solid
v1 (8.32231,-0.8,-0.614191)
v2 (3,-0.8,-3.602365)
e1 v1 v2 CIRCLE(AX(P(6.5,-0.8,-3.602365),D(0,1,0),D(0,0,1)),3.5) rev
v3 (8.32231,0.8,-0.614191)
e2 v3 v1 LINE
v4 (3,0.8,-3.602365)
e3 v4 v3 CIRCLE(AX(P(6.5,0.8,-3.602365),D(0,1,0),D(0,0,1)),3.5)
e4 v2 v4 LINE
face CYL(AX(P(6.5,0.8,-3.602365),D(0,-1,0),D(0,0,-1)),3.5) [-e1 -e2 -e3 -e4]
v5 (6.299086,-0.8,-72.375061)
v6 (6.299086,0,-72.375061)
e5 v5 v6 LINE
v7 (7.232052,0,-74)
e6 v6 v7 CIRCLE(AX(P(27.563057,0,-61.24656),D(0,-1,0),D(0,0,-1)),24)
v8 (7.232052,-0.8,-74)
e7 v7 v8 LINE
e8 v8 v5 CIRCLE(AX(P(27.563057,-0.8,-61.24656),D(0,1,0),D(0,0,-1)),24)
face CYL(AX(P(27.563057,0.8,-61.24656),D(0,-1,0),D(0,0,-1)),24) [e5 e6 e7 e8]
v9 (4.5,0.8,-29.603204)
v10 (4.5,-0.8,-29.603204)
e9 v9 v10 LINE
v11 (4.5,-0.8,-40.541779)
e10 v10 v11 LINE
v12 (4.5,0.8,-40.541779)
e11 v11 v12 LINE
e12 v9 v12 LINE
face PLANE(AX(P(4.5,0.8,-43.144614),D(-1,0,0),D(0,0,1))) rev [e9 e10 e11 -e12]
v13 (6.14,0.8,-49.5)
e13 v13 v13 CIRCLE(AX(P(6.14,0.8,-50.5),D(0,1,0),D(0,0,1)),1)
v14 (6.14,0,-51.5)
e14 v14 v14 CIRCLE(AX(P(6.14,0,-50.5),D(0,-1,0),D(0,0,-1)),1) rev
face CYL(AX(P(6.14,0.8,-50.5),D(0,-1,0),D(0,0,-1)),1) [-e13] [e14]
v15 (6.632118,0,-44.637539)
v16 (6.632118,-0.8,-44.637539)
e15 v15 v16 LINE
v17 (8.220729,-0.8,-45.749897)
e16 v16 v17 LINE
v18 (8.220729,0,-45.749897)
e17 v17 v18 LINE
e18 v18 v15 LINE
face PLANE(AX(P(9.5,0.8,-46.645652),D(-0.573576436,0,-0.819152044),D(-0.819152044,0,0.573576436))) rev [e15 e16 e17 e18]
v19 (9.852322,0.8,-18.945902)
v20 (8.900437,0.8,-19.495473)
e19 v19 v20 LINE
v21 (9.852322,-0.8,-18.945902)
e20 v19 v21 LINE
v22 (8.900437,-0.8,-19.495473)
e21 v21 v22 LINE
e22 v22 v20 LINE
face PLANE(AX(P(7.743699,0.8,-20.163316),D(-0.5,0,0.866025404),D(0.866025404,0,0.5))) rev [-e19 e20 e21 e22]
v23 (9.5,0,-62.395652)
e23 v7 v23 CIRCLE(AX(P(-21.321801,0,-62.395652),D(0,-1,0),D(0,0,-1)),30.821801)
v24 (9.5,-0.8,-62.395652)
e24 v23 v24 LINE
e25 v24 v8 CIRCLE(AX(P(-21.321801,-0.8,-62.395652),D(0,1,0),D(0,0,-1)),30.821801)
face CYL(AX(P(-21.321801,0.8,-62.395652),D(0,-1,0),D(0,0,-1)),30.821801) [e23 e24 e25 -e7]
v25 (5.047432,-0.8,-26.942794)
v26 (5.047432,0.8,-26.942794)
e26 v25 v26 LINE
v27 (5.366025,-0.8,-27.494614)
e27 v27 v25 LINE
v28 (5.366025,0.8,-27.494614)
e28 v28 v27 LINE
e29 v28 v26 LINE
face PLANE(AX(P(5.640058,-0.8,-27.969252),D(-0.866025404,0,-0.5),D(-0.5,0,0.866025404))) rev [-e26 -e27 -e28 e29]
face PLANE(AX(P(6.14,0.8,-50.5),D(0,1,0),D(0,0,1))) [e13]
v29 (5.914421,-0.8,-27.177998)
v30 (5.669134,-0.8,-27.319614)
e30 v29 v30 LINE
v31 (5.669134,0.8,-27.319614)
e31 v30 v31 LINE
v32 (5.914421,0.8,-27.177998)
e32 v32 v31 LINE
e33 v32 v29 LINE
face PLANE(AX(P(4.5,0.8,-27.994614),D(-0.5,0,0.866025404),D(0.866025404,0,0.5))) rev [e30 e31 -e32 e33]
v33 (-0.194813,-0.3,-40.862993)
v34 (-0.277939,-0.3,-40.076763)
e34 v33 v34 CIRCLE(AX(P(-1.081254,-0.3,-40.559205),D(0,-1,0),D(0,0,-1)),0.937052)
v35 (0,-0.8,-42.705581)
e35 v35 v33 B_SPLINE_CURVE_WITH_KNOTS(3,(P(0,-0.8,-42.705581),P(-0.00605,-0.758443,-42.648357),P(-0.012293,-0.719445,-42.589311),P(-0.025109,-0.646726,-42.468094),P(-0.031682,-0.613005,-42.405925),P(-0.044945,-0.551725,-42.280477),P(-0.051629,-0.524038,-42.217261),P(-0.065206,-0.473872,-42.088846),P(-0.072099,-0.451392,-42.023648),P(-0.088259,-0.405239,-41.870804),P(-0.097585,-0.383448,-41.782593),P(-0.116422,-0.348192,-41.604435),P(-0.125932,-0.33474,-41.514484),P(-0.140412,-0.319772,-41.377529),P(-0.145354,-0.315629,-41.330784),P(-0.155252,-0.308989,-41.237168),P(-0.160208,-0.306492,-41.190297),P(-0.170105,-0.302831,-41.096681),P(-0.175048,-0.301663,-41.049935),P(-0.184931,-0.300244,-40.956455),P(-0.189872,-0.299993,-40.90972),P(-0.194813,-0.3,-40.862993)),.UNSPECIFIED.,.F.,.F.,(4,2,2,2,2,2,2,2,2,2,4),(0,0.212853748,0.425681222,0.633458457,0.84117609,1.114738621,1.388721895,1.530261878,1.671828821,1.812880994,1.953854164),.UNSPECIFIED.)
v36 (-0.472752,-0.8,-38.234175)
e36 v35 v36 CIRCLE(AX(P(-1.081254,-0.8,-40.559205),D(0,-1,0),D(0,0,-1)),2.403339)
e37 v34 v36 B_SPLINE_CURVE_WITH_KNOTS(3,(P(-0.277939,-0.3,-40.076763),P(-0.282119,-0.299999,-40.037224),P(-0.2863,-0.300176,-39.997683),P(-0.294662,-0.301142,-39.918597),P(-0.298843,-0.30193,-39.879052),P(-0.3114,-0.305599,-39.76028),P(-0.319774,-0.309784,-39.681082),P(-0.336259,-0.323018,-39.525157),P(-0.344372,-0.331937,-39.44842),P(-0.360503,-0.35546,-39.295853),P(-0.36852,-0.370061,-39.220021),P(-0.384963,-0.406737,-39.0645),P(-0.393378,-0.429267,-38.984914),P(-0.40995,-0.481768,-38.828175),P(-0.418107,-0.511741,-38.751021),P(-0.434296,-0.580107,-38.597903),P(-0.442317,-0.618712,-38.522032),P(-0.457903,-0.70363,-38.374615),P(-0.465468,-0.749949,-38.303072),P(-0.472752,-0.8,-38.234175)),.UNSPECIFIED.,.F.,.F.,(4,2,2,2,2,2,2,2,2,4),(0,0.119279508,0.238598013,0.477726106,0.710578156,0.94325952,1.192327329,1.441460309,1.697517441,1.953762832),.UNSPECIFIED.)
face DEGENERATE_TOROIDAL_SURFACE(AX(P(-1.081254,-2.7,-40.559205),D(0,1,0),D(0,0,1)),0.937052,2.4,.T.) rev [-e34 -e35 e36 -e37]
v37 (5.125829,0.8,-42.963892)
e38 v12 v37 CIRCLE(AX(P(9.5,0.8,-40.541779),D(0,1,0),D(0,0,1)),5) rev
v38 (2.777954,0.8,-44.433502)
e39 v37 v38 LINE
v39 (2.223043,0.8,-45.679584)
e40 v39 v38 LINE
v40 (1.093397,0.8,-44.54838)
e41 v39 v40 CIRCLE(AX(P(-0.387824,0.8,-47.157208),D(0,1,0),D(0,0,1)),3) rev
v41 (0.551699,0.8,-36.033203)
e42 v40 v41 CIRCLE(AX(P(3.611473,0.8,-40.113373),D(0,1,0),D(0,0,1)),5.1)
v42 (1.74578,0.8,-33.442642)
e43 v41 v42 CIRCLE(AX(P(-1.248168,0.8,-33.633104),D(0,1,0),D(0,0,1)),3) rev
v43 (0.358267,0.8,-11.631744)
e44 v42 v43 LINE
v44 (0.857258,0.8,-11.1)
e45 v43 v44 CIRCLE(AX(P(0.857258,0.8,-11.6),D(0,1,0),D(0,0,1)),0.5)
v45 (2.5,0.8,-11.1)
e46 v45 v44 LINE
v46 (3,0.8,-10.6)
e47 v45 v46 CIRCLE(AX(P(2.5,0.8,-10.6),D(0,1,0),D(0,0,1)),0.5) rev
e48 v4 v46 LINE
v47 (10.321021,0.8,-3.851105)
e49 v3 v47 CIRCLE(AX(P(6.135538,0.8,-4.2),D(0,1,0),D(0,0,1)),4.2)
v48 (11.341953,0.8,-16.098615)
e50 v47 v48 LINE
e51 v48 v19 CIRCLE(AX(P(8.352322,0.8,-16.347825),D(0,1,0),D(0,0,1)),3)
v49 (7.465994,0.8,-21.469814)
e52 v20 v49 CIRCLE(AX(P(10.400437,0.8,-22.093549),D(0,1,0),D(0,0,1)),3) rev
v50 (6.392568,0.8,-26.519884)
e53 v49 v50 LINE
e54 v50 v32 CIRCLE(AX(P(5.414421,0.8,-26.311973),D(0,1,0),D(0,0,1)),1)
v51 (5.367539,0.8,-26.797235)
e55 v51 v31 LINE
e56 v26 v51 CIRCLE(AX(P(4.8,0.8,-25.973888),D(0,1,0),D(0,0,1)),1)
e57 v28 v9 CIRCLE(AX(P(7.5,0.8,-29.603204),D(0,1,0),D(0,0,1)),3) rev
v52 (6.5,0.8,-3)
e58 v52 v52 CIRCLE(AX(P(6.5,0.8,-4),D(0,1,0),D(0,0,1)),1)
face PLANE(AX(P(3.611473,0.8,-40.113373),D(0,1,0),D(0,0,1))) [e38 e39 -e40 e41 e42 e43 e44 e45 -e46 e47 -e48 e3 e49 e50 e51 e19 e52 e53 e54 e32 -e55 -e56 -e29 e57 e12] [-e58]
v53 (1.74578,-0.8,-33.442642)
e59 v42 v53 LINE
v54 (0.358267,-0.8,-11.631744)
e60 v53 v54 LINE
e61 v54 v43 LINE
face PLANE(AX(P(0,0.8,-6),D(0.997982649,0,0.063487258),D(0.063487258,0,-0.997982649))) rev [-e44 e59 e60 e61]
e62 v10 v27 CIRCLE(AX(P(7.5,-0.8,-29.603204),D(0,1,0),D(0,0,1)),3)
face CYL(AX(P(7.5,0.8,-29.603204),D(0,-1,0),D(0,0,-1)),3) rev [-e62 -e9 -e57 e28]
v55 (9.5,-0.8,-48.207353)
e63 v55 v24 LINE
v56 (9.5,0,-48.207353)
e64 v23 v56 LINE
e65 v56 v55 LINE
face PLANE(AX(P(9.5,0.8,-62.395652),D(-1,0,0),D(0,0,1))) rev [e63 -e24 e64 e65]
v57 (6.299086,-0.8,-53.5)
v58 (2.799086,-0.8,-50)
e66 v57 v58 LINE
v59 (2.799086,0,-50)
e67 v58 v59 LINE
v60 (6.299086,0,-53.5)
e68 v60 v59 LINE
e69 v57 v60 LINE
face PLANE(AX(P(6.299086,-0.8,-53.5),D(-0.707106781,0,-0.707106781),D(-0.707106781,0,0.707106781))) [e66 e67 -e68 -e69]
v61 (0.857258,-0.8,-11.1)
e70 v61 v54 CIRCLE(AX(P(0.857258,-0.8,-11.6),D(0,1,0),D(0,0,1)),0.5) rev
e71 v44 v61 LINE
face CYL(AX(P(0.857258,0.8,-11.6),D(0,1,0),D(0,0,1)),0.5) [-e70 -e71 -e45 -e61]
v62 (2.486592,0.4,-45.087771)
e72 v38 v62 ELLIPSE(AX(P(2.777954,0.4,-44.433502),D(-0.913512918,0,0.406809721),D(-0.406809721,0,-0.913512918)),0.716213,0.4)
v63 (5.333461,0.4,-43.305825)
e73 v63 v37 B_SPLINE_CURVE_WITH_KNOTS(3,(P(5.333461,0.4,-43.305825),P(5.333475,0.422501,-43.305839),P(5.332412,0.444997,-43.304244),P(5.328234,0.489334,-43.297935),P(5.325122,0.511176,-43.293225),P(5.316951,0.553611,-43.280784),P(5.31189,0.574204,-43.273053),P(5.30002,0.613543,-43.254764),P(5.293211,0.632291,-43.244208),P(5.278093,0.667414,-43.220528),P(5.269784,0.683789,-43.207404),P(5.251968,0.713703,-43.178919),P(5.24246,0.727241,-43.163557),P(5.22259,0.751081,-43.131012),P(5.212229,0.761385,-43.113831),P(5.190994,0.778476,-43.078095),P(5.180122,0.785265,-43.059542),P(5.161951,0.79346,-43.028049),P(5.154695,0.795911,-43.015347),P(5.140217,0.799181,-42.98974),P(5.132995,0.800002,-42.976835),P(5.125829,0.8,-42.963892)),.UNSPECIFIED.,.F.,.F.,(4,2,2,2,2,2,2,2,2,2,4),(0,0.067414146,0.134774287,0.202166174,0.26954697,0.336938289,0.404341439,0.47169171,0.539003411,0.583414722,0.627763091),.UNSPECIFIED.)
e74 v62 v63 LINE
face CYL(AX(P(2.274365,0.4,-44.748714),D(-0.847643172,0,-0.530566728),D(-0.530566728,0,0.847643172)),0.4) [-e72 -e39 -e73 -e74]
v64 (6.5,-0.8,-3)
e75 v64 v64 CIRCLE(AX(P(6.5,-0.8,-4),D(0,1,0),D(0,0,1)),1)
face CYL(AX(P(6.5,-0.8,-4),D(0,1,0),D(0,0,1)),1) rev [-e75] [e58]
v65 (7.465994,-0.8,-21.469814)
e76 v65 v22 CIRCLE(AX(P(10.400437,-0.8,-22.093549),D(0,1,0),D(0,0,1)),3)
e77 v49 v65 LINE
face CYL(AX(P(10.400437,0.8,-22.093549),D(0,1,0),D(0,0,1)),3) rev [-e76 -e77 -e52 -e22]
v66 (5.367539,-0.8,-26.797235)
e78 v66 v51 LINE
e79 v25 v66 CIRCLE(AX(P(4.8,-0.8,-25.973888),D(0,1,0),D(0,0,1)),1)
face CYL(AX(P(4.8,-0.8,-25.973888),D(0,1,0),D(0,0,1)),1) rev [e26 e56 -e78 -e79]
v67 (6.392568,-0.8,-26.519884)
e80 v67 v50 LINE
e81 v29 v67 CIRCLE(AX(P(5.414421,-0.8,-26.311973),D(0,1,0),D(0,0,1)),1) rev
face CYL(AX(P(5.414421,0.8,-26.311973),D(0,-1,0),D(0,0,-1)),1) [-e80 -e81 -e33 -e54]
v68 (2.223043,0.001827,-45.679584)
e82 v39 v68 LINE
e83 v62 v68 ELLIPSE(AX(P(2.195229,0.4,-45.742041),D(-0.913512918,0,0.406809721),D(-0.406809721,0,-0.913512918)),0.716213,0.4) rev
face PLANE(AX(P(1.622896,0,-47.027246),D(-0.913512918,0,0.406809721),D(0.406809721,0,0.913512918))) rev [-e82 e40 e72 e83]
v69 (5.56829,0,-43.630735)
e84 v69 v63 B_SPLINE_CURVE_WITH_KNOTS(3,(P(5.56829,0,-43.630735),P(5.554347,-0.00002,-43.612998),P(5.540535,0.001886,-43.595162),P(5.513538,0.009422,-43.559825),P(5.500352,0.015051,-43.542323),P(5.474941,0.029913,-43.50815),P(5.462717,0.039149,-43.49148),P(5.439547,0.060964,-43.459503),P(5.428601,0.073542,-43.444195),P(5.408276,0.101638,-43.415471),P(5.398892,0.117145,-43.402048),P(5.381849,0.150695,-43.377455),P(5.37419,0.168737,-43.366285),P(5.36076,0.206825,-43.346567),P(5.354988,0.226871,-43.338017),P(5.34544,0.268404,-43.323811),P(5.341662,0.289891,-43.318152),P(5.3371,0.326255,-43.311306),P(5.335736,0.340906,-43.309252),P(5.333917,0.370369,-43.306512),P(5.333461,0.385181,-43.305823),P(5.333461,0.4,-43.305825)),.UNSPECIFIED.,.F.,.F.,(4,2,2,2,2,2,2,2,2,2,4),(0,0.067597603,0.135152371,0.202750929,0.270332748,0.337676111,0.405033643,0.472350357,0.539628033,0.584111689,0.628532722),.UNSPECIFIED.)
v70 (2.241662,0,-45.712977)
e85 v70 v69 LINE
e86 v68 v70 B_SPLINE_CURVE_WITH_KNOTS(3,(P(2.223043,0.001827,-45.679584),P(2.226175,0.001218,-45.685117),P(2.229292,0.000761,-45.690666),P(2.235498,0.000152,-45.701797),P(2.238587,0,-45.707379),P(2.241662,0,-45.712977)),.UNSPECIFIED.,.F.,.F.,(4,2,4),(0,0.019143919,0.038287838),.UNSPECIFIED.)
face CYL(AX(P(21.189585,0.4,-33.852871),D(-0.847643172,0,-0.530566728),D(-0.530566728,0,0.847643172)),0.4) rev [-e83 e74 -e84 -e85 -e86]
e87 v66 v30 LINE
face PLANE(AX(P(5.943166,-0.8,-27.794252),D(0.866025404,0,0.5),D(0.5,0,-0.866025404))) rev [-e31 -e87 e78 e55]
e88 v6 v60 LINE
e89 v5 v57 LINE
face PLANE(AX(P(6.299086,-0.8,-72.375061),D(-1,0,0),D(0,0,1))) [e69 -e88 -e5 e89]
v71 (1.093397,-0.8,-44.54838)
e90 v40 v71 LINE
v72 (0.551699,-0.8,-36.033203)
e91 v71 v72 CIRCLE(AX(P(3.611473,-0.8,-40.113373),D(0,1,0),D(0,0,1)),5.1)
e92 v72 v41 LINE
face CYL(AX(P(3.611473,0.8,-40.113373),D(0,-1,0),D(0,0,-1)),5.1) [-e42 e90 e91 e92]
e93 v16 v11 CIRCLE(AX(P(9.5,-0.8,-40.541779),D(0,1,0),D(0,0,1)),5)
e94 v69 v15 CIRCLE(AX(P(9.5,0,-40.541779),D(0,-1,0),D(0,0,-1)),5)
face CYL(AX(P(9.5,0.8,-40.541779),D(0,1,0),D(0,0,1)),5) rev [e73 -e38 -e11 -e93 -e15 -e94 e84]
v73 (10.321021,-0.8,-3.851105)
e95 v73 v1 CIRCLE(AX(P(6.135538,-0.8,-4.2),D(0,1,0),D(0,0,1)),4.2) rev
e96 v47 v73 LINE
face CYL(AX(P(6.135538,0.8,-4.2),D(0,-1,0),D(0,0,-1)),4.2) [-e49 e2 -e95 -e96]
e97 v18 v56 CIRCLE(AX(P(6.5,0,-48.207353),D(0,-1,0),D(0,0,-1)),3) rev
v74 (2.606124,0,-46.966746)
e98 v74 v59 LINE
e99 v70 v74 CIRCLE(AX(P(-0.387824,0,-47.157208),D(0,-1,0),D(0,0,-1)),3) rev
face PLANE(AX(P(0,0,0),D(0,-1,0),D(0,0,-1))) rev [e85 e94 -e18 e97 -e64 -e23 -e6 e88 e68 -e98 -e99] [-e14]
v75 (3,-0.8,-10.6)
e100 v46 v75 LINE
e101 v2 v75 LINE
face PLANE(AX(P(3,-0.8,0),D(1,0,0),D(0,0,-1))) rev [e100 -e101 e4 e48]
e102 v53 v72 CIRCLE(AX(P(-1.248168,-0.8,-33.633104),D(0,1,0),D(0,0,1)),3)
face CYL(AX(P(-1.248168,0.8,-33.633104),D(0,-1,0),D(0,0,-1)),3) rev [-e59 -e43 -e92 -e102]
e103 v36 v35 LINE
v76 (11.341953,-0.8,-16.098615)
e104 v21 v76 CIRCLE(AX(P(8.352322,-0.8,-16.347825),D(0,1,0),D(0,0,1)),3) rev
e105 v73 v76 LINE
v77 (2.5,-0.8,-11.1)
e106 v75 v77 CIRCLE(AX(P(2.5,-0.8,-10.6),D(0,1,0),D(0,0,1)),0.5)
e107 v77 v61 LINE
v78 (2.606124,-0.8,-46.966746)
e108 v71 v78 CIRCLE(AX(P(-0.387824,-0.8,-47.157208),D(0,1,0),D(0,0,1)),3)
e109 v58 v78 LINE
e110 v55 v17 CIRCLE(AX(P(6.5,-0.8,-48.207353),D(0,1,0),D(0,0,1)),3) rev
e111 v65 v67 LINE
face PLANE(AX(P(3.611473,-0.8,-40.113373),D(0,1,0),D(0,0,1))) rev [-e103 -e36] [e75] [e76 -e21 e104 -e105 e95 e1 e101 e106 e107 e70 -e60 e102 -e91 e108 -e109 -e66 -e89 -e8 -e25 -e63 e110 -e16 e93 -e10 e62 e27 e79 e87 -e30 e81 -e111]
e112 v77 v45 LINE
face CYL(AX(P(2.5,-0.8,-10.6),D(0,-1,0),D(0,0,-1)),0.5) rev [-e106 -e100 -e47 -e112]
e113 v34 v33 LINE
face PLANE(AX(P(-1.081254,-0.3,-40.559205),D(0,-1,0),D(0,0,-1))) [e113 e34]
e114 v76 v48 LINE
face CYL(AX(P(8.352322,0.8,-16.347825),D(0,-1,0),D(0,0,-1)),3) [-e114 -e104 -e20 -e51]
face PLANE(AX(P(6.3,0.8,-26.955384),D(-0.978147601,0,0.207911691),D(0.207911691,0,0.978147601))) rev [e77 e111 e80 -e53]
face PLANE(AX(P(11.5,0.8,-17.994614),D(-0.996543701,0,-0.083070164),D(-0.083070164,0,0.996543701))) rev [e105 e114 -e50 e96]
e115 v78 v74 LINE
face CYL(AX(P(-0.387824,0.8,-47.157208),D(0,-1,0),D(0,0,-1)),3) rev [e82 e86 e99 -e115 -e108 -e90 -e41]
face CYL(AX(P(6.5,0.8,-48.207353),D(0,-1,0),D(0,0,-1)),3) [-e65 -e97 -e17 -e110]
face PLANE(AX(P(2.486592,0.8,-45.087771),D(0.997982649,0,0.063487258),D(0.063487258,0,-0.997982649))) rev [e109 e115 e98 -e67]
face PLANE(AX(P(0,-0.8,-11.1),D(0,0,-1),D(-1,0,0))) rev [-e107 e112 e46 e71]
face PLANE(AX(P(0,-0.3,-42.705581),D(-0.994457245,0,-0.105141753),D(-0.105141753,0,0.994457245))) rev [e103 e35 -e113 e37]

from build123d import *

# Parameters (mm, degrees)
BOSS_EXTRUDE1_DEPTH     = 0.8
FILLET1_R               = 4.2
SKETCH2_R               = 1
CUT_EXTRUDE1_DEPTH      = 75.905340264
CUT_EXTRUDE2_DEPTH      = 75.905340264
CUT_EXTRUDE_THIN1_DEPTH = 75.905340264
FILLET2_R               = 3
CUT_EXTRUDE4_DEPTH      = 0.8
FILLET3_R               = 5
FILLET4_R               = 0.4
FILLET5_R               = 3
FILLET6_R               = 1
SKETCH6_R               = 1
BOSS_EXTRUDE2_DEPTH     = 0.8
SKETCH7_W               = 3
SKETCH7_H               = 11.1
CUT_EXTRUDE5_DEPTH      = 75.882809828
FILLET7_R               = 0.5
FILLET8_R               = 0.5
FILLET10_R              = 3.5
CUT_EXTRUDE6_DEPTH      = 0.5
FILLET11_R              = 2.4


# Some blends are built 0.0001 mm under size
with BuildPart() as part:
    # Sketch1 → Boss-Extrude1 (new, symmetric)
    with BuildSketch(Plane(origin=(0, 0, 0), x_dir=(1, 0, 0), z_dir=(0, 1, 0))):
        with BuildLine():
            Line((0, 0), (0, 6))
            Line((0, 6), (1.865312064, 35.32161706))
            ThreePointArc((1.865312064, 35.32161706), (-1.478238126, 40.437157563), (2.486591749, 45.087771133))
            Line((2.486591749, 45.087771133), (3.611473385, 62.770253978))
            ThreePointArc((3.611473385, 62.770253978), (4.720909281, 68.611088902), (7.232052008, 74))
            ThreePointArc((7.232052008, 74), (8.927699757, 68.307599169), (9.5, 62.395651864))
            Line((9.5, 62.395651864), (9.5, 46.645651864))
            Line((9.5, 46.645651864), (4.5, 43.144614173))
            Line((4.5, 43.144614173), (4.5, 27.994614173))
            Line((4.5, 27.994614173), (6.3, 26.955383689))
            Line((6.3, 26.955383689), (7.743698597, 20.163315799))
            Line((7.743698597, 20.163315799), (11.5, 17.994614173))
            Line((11.5, 17.994614173), (10, 0))
            Line((10, 0), (0, 0))
        make_face()
    extrude(amount=BOSS_EXTRUDE1_DEPTH, both=True)

    # Fillet1
    fillet1_edges = [part.edges().sort_by_distance(p)[0] for p in [
        (10, 0, 0),
    ]]
    fillet(fillet1_edges, radius=FILLET1_R)

    # Sketch2 → Cut-Extrude1 (cut, through all)
    with BuildSketch(Plane(origin=(0, 0.8, 0), x_dir=(1, 0, 0), z_dir=(0, 1, 0))):
        with Locations(Location((6.5, 4, 0), (0, 0, 270))):
            Circle(SKETCH2_R)
    extrude(amount=-CUT_EXTRUDE1_DEPTH, mode=Mode.SUBTRACT)

    # Sketch3 → Cut-Extrude2 (cut, through all)
    with BuildSketch(Plane(origin=(0, 0.8, 0), x_dir=(1, 0, 0), z_dir=(0, 1, 0))):
        with BuildLine():
            Line((5.640057539, 27.969251754), (5.047431638, 26.942793585))
            ThreePointArc((5.047431638, 26.942793585), (4.386066515, 25.063581102), (5.367538565, 26.797235046))
            Line((5.367538565, 26.797235046), (5.94316643, 27.794251754))
            Line((5.94316643, 27.794251754), (5.640057539, 27.969251754))
        make_face()
    extrude(amount=-CUT_EXTRUDE2_DEPTH, mode=Mode.SUBTRACT)

    # Sketch4 → Cut-Extrude-Thin1 (cut, through all)
    with BuildSketch(Plane(origin=(0, 0.8, 0), x_dir=(1, 0, 0), z_dir=(0, 1, 0))):
        Polygon((6.299086102, 72.375061168), (6.299086102, 53.5), (2.799086102, 50), (-4.271981709, 57.071067812), (-3.700913898, 57.642135624), (-3.700913898, 72.375061168), align=None)
    extrude(amount=-CUT_EXTRUDE_THIN1_DEPTH, mode=Mode.SUBTRACT)

    # Fillet2
    fillet2_edges = [part.edges().sort_by_distance(p)[0] for p in [
        (1.865312064, 0, -35.32161706),
        (2.486591749, 0, -45.087771133),
        (9.5, 0, -46.645651864),
    ]]
    fillet(fillet2_edges, radius=FILLET2_R)

    # Sketch5 → Cut-Extrude4 (cut)
    with BuildSketch(Plane(origin=(0, 0.8, 0), x_dir=(1, 0, 0), z_dir=(0, 1, 0))):
        Polygon((2.486591749, 45.087771133), (13.455116217, 38.22222401), (13.455116217, 80.886155846), (2.486591749, 80.886155846), (1.62289593, 47.027246142), align=None)
    extrude(amount=-CUT_EXTRUDE4_DEPTH, mode=Mode.SUBTRACT)

    # Fillet3
    fillet3_edges = [part.edges().sort_by_distance(p)[0] for p in [
        (4.5, 0, -43.144614173),
    ]]
    fillet(fillet3_edges, radius=FILLET3_R)

    # Fillet4
    fillet4_edges = [part.edges().sort_by_distance(p)[0] for p in [
        (3.91002639, 0, -44.196798274),
        (3.91002639, 0.8, -44.196798274),
    ]]
    fillet(fillet4_edges, radius=FILLET4_R - 0.0001)  # a hair under: the kernel refuses the full size

    # Fillet5
    # the kernel refuses this fillet: 3 mm, written as the material it adds along each edge
    with BuildSketch(Plane(origin=(4.5, 0.8, -27.994614173), x_dir=(0.8660254037844444, 0, 0.49999999999999023), z_dir=(0, -1, 0))) as fillet5_piece_1:
        with BuildLine():
            CenterArc((1.793781136, -2.893079935), FILLET5_R, 105.342812505, 44.657187495)
            Line((-0.804295075, -1.393079935), (0, 0))
            Line((0, 0), (1, 0))
        make_face()
    extrude(amount=1.6)
    with BuildSketch(Plane(origin=(7.743698597, 0.8, -20.163315799), x_dir=(0.8660254037844403, 0, 0.49999999999999734), z_dir=(0, -1, 0))) as fillet5_piece_2:
        with BuildLine():
            CenterArc((FILLET5_R * 0.445228685309, -FILLET5_R), FILLET5_R, 90, 48)
            Line((-FILLET5_R * 0.297916140169, -FILLET5_R * 0.330869393641), (0, 0))
            Line((0, 0), (FILLET5_R * 0.445228685309, 0))
        make_face()
    extrude(amount=1.6)
    # the kernel refuses this fillet: 3 mm, written as the material it takes off along each edge
    with BuildSketch(Plane(origin=(11.5, -5.55643762, -17.994614173), x_dir=(-0.86602540378444, 0, -0.49999999999999756), z_dir=(0, 1, 0))) as fillet5_2_piece_1:
        with BuildLine():
            CenterArc((FILLET5_R * 0.634191682642, FILLET5_R), FILLET5_R, 205.234939105, 64.765060895)
            Line((-FILLET5_R * 0.270375560362, FILLET5_R * 0.573669021903), (0, 0))
            Line((0, 0), (FILLET5_R * 0.634191682642, 0))
        make_face()
    extrude(amount=11.11287524, mode=Mode.SUBTRACT)

    # Fillet6
    fillet6_edges = [part.edges().sort_by_distance(p)[0] for p in [
        (6.3, 0, -26.955383689),
    ]]
    fillet(fillet6_edges, radius=FILLET6_R)

    # Sketch6 → Boss-Extrude2 (add)
    with BuildSketch(Plane(origin=(0, 0, 0), x_dir=(1, 0, 0), z_dir=(0, 1, 0))):
        with Locations(Location((6.14, 50.5, 0), (0, 0, 90))):
            Circle(SKETCH6_R)
    extrude(amount=BOSS_EXTRUDE2_DEPTH)

    # Sketch7 → Cut-Extrude5 (cut, through all)
    with BuildSketch(Plane(origin=(0, 0.8, 0), x_dir=(1, 0, 0), z_dir=(0, 1, 0))):
        with Locations((1.5, 5.55)):
            Rectangle(SKETCH7_W, SKETCH7_H)
    extrude(amount=-CUT_EXTRUDE5_DEPTH, mode=Mode.SUBTRACT)

    # Fillet7
    fillet7_edges = [part.edges().sort_by_distance(p)[0] for p in [
        (0.324439526, 0, -11.1),
    ]]
    fillet(fillet7_edges, radius=FILLET7_R)

    # Fillet8
    fillet8_edges = [part.edges().sort_by_distance(p)[0] for p in [
        (3, 0, -11.1),
    ]]
    fillet(fillet8_edges, radius=FILLET8_R)

    # Fillet10
    fillet10_edges = [part.edges().sort_by_distance(p)[0] for p in [
        (3, 0, 0),
    ]]
    fillet(fillet10_edges, radius=FILLET10_R)

    # Sketch8 → Cut-Extrude6 (cut)
    with BuildSketch(Plane.XZ.offset(0.8)):
        with BuildLine():
            Line((0, -42.705581243), (-0.472751816, -38.234175203))
            ThreePointArc((-0.472751816, -38.234175203), (1.308763911, -40.306514027), (0, -42.705581243))
        make_face()
    extrude(amount=-CUT_EXTRUDE6_DEPTH, mode=Mode.SUBTRACT)

    # Fillet11
    # the kernel refuses this fillet: 2.4 mm, written as the material it adds along each edge
    with BuildSketch(Plane(origin=(-1.081254443, -0.3, -40.559205352), x_dir=(-0.9553191525831795, 0, 0.2955762451682408), z_dir=(-0.2955762451682408, 0, -0.9553191525831795))) as fillet11_piece_1_section:
        with BuildLine():
            CenterArc((0.937051647, -2.4), FILLET11_R, 52.341537994, 37.658462006)
            Line((0.937051647, 0), (0.937051647, 0.048))
            Line((0.937051647, 0.048), (2.403339477, 0.048))
            Line((2.403339477, 0.048), (2.451339477, 0))
            ThreePointArc((2.451339477, 0), (2.451339477, -0.25), (2.432665233, -0.462))
            Line((2.432665233, -0.462), (2.403339477, -0.5))
        make_face()
    fillet11_piece_1 = revolve(axis=Axis((-1.081254443, -0.3, -40.559205352), (0, 1, 0)), revolution_arc=313.54514328, mode=Mode.PRIVATE)
    fillet11_piece_1 = split(fillet11_piece_1, bisect_by=Plane(origin=(-0.236375908, -0.3, -40.469878223), z_dir=(0.9944572448546122, 0, 0.1051417526778682)), keep=Keep.TOP, mode=Mode.PRIVATE)
    add(fillet11_piece_1)


solid = part.part
